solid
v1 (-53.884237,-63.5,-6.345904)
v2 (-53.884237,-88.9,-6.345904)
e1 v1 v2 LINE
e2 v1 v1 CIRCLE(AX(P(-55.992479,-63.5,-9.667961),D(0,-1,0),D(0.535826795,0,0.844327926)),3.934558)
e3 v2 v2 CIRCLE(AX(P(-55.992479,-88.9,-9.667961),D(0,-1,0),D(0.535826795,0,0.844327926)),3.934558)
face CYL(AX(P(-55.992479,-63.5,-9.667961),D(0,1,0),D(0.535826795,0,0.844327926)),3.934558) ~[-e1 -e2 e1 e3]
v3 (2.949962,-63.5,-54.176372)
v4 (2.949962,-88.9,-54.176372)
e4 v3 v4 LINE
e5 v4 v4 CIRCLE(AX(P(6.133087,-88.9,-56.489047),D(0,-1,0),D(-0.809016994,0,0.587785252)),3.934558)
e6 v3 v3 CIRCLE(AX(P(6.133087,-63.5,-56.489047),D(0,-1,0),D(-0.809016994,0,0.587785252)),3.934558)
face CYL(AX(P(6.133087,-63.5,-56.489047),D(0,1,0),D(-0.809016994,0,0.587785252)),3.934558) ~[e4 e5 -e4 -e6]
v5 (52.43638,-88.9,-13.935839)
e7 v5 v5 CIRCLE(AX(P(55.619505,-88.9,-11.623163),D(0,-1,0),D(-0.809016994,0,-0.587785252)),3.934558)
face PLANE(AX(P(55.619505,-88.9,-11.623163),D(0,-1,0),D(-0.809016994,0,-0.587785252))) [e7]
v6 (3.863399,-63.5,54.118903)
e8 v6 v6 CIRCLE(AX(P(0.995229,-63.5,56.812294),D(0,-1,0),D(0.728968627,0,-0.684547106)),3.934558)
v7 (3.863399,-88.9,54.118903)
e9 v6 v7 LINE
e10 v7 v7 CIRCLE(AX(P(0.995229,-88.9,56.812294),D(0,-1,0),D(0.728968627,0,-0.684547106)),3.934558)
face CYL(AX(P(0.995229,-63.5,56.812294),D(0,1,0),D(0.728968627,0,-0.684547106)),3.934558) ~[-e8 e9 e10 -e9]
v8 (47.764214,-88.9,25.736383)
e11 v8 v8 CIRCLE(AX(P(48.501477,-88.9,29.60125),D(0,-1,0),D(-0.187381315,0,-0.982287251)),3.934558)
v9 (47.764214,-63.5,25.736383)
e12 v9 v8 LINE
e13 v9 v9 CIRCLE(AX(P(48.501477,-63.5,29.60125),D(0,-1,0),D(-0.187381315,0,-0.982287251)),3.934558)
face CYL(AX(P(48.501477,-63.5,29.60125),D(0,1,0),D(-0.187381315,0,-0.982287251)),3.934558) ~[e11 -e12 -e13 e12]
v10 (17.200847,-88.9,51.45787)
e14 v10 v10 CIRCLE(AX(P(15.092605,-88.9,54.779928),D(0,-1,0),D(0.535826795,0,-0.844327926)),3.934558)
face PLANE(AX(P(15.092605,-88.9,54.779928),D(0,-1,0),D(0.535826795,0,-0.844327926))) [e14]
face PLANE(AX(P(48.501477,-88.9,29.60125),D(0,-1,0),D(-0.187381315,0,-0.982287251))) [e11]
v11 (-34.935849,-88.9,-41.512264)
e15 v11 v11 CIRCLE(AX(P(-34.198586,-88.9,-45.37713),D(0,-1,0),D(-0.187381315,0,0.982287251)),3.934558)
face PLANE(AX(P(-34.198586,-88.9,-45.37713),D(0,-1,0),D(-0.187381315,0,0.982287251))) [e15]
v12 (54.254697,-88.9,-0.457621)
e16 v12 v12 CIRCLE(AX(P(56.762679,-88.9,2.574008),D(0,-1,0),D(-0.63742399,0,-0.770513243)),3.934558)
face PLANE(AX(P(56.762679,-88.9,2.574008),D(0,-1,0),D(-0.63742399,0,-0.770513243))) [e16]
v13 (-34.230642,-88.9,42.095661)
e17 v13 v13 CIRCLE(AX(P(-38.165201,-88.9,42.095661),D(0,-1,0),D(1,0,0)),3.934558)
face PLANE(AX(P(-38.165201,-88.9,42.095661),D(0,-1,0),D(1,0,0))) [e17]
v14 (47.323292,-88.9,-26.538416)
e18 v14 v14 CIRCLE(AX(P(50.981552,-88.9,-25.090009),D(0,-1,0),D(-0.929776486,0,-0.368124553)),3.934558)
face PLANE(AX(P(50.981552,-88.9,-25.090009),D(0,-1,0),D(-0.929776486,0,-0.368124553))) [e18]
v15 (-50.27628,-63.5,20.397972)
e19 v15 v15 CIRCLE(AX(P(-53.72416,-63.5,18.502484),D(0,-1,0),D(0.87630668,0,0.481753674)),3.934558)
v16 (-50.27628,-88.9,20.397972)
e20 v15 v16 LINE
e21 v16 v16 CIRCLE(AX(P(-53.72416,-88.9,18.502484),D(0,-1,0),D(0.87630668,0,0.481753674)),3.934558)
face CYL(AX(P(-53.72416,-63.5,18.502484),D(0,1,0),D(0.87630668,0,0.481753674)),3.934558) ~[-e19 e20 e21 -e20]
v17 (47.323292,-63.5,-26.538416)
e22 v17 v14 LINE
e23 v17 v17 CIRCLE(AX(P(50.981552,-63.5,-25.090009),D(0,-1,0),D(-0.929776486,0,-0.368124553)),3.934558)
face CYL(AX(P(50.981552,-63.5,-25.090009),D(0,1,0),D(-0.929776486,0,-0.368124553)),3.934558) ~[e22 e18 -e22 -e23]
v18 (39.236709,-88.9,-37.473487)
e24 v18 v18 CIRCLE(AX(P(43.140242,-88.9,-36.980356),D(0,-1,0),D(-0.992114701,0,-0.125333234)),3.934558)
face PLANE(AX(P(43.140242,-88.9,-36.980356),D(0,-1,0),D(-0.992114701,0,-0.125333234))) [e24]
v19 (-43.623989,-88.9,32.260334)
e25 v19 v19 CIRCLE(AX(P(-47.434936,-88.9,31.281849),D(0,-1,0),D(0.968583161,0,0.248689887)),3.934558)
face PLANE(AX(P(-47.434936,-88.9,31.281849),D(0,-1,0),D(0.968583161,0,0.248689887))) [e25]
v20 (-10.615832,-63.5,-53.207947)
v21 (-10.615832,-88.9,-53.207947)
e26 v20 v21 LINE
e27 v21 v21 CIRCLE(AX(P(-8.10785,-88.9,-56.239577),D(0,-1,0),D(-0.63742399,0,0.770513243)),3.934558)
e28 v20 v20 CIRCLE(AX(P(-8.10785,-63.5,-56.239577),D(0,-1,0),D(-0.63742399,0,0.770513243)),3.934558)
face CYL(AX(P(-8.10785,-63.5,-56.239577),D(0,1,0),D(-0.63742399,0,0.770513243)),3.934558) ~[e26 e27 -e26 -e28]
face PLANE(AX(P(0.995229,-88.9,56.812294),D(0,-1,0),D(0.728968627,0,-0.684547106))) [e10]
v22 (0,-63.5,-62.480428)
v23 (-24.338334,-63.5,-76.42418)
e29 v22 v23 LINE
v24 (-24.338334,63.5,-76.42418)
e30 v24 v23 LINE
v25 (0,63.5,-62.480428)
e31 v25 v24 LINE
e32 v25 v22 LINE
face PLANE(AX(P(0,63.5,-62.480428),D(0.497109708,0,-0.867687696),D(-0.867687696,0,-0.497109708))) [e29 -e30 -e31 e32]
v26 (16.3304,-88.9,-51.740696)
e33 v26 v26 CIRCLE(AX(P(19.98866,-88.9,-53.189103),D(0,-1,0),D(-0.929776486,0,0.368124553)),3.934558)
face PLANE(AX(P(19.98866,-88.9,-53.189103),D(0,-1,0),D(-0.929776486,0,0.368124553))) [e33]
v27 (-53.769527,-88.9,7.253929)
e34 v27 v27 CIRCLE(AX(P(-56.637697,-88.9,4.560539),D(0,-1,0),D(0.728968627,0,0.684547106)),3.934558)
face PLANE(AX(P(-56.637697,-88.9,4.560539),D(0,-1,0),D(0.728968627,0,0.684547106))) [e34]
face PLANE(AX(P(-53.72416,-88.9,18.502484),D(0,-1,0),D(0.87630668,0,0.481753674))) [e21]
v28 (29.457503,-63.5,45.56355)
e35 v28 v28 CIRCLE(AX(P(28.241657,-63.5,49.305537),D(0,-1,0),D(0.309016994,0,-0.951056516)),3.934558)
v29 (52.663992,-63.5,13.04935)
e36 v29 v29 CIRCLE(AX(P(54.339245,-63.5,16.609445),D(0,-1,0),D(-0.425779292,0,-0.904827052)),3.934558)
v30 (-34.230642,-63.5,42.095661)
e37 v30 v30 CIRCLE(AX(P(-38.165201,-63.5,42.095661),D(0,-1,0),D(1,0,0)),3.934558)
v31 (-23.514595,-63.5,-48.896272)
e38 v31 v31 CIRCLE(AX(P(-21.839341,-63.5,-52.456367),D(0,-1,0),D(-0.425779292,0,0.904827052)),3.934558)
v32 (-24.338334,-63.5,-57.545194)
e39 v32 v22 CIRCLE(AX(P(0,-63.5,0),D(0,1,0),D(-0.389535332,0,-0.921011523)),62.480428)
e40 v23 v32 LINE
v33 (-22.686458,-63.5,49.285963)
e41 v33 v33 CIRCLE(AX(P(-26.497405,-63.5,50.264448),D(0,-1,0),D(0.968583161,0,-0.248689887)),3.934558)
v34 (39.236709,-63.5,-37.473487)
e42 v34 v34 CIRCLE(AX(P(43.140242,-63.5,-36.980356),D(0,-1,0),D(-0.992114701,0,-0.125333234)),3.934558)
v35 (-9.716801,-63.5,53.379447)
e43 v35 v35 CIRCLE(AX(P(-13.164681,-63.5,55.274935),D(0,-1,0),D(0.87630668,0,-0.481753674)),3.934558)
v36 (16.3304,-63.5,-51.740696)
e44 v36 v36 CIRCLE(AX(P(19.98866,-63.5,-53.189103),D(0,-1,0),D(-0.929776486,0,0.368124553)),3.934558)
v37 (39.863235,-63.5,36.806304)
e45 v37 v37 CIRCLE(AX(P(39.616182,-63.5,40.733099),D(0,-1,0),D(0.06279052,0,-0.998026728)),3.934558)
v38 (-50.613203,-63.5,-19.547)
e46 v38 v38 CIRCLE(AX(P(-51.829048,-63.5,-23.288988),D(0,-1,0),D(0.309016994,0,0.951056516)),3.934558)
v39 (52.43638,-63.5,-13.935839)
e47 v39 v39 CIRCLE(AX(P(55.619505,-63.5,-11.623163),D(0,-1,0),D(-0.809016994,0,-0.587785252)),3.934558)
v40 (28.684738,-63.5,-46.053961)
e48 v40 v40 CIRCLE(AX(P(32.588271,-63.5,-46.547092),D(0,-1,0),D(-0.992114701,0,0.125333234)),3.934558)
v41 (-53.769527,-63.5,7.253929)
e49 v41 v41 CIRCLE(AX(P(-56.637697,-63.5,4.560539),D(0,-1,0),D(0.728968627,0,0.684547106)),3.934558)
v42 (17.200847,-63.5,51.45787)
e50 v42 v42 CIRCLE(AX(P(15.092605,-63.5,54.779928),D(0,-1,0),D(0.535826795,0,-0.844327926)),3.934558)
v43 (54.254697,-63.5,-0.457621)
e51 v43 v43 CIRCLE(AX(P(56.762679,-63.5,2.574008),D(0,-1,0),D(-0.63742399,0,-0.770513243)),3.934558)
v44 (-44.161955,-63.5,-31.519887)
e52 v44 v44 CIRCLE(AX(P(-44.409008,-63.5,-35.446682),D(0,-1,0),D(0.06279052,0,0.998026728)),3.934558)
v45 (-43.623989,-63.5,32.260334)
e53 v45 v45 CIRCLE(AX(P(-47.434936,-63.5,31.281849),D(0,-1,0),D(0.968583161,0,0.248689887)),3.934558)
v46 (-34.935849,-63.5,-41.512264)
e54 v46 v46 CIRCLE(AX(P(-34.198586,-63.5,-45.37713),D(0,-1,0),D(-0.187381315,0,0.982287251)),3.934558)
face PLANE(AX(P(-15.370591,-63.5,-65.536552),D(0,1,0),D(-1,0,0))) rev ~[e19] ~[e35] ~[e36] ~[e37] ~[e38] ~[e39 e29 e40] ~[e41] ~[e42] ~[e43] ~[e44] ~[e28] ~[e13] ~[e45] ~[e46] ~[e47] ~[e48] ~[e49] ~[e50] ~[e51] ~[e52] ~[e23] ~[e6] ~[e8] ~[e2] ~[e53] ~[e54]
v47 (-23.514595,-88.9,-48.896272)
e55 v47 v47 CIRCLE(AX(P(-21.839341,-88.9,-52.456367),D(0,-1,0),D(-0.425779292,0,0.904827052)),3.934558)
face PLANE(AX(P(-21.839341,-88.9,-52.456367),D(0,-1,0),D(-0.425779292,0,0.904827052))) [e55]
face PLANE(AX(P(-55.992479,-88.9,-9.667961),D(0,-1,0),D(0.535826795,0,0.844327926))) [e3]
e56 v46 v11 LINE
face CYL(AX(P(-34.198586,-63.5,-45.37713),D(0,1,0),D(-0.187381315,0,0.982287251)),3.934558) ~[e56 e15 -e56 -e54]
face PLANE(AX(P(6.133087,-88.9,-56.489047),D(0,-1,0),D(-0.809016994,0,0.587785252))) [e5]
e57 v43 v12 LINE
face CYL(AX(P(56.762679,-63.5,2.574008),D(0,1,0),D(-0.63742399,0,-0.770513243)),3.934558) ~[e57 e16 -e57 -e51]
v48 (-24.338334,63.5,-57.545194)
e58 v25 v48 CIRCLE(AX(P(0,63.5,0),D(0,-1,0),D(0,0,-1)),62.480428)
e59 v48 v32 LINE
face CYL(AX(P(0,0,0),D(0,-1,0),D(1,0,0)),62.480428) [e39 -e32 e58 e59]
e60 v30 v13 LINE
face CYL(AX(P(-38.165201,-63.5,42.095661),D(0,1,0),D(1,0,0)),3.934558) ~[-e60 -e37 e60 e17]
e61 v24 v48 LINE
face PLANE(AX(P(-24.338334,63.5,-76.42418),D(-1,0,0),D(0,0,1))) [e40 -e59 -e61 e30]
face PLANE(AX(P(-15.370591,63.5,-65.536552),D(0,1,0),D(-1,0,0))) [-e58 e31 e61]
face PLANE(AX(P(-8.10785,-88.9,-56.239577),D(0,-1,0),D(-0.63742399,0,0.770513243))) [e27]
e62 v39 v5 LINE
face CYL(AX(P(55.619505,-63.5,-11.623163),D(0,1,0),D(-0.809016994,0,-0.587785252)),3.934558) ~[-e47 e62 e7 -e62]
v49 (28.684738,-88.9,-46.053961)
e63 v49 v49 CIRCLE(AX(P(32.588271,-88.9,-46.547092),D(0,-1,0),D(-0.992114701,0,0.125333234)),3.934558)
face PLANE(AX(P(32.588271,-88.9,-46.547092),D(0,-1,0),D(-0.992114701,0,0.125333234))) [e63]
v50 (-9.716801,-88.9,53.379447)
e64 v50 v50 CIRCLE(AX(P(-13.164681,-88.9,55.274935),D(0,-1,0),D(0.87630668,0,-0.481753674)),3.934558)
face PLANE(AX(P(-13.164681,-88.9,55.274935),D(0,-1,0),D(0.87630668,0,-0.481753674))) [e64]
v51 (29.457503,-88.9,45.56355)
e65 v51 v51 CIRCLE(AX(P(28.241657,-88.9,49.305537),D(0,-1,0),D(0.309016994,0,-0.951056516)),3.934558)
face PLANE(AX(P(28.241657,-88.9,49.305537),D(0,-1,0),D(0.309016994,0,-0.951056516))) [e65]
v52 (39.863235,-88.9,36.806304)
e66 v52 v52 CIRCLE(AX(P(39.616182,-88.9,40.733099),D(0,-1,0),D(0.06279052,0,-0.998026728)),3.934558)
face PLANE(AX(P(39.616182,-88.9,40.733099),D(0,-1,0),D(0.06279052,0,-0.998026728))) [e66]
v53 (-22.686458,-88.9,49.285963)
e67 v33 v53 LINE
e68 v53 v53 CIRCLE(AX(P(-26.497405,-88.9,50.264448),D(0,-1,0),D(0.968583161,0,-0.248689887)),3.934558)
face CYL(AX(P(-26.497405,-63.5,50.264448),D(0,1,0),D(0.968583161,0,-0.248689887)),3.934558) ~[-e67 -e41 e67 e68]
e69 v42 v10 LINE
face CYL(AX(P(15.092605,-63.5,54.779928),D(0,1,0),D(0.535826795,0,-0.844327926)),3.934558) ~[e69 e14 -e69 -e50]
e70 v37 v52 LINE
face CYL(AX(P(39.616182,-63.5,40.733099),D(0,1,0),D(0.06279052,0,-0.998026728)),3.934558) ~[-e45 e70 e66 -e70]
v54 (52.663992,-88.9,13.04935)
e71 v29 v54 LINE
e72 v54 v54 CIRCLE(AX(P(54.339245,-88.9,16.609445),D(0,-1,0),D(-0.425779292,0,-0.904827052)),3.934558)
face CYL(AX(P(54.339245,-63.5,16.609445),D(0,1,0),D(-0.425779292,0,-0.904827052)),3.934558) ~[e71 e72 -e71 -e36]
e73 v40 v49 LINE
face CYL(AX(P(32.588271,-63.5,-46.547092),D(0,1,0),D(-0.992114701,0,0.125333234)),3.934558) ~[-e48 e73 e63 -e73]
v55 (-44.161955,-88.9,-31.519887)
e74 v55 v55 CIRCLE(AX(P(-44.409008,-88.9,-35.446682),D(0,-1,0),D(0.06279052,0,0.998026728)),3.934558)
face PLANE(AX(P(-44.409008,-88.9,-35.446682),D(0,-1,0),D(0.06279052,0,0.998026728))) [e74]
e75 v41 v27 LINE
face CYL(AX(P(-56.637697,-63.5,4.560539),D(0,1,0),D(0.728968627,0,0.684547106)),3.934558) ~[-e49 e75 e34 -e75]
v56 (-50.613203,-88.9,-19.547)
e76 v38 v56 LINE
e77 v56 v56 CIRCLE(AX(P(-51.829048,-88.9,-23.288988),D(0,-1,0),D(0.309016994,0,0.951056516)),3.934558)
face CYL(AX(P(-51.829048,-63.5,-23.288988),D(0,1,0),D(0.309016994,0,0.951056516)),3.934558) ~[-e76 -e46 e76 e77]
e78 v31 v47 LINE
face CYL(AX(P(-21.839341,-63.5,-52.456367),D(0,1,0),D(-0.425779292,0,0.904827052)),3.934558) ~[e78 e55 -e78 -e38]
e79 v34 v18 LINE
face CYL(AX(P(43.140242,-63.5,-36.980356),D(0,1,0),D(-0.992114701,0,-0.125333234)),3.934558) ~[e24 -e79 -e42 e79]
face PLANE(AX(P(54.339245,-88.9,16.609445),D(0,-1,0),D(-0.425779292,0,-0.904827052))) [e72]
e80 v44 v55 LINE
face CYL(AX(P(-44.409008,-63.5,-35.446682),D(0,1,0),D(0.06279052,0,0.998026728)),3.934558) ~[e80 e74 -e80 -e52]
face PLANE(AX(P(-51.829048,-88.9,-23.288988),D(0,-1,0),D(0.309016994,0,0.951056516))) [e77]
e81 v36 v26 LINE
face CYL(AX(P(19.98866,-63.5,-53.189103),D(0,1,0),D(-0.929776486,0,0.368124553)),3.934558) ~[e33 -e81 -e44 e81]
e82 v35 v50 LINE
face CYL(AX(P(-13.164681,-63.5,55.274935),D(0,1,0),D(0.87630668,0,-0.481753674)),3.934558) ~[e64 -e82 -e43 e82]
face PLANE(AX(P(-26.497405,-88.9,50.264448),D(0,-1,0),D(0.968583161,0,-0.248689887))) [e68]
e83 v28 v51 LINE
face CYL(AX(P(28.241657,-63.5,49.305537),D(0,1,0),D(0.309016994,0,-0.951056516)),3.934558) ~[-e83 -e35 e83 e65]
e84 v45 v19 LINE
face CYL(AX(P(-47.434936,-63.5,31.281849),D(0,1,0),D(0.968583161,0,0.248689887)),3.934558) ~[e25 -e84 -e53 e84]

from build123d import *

# Parameters (mm, degrees)
F0_R            = 62.480427788
F1_DEPTH        = 63.5
F2_R            = 3.934558481
F3_DEPTH        = 25.4
F3_COPIES_COUNT = 25
F5_DEPTH        = 127


# Not quite as in the source:
# - a pattern or mirror of a feature is missing from the dataset's text; its kind, count and spacing are read off the source's solid


with BuildPart() as f1:
    # F0 (on Front) → F1 (new body, symmetric)
    with BuildSketch(Plane.XZ):
        Circle(F0_R)
    extrude(amount=F1_DEPTH, both=True)

    # F2 (on face) → F3 (join)
    with BuildSketch(Plane.XZ.offset(63.5)):
        with Locations((-38.1652005017, 42.0956611633)):
            Circle(F2_R)
    f3 = extrude(amount=F3_DEPTH)

    # F3_copies: F3 ×25 about axis
    f3_copies_axis = Axis((0, 0, 0), (0, 1, 0))
    for i in range(1, F3_COPIES_COUNT):
        add(f3.rotate(f3_copies_axis, i * 360 / F3_COPIES_COUNT))

    # F4 (on face) → F5 (join)
    with BuildSketch(Plane(origin=(0, 63.5, 0), x_dir=(-1, 0, 0), z_dir=(0, 1, 0))):
        Polygon((24.3383341717, -76.4241799678), (24.3383341717, -57.5451939463), (0, -62.480427788), align=None)
    extrude(amount=-F5_DEPTH)


solid = f1.part
